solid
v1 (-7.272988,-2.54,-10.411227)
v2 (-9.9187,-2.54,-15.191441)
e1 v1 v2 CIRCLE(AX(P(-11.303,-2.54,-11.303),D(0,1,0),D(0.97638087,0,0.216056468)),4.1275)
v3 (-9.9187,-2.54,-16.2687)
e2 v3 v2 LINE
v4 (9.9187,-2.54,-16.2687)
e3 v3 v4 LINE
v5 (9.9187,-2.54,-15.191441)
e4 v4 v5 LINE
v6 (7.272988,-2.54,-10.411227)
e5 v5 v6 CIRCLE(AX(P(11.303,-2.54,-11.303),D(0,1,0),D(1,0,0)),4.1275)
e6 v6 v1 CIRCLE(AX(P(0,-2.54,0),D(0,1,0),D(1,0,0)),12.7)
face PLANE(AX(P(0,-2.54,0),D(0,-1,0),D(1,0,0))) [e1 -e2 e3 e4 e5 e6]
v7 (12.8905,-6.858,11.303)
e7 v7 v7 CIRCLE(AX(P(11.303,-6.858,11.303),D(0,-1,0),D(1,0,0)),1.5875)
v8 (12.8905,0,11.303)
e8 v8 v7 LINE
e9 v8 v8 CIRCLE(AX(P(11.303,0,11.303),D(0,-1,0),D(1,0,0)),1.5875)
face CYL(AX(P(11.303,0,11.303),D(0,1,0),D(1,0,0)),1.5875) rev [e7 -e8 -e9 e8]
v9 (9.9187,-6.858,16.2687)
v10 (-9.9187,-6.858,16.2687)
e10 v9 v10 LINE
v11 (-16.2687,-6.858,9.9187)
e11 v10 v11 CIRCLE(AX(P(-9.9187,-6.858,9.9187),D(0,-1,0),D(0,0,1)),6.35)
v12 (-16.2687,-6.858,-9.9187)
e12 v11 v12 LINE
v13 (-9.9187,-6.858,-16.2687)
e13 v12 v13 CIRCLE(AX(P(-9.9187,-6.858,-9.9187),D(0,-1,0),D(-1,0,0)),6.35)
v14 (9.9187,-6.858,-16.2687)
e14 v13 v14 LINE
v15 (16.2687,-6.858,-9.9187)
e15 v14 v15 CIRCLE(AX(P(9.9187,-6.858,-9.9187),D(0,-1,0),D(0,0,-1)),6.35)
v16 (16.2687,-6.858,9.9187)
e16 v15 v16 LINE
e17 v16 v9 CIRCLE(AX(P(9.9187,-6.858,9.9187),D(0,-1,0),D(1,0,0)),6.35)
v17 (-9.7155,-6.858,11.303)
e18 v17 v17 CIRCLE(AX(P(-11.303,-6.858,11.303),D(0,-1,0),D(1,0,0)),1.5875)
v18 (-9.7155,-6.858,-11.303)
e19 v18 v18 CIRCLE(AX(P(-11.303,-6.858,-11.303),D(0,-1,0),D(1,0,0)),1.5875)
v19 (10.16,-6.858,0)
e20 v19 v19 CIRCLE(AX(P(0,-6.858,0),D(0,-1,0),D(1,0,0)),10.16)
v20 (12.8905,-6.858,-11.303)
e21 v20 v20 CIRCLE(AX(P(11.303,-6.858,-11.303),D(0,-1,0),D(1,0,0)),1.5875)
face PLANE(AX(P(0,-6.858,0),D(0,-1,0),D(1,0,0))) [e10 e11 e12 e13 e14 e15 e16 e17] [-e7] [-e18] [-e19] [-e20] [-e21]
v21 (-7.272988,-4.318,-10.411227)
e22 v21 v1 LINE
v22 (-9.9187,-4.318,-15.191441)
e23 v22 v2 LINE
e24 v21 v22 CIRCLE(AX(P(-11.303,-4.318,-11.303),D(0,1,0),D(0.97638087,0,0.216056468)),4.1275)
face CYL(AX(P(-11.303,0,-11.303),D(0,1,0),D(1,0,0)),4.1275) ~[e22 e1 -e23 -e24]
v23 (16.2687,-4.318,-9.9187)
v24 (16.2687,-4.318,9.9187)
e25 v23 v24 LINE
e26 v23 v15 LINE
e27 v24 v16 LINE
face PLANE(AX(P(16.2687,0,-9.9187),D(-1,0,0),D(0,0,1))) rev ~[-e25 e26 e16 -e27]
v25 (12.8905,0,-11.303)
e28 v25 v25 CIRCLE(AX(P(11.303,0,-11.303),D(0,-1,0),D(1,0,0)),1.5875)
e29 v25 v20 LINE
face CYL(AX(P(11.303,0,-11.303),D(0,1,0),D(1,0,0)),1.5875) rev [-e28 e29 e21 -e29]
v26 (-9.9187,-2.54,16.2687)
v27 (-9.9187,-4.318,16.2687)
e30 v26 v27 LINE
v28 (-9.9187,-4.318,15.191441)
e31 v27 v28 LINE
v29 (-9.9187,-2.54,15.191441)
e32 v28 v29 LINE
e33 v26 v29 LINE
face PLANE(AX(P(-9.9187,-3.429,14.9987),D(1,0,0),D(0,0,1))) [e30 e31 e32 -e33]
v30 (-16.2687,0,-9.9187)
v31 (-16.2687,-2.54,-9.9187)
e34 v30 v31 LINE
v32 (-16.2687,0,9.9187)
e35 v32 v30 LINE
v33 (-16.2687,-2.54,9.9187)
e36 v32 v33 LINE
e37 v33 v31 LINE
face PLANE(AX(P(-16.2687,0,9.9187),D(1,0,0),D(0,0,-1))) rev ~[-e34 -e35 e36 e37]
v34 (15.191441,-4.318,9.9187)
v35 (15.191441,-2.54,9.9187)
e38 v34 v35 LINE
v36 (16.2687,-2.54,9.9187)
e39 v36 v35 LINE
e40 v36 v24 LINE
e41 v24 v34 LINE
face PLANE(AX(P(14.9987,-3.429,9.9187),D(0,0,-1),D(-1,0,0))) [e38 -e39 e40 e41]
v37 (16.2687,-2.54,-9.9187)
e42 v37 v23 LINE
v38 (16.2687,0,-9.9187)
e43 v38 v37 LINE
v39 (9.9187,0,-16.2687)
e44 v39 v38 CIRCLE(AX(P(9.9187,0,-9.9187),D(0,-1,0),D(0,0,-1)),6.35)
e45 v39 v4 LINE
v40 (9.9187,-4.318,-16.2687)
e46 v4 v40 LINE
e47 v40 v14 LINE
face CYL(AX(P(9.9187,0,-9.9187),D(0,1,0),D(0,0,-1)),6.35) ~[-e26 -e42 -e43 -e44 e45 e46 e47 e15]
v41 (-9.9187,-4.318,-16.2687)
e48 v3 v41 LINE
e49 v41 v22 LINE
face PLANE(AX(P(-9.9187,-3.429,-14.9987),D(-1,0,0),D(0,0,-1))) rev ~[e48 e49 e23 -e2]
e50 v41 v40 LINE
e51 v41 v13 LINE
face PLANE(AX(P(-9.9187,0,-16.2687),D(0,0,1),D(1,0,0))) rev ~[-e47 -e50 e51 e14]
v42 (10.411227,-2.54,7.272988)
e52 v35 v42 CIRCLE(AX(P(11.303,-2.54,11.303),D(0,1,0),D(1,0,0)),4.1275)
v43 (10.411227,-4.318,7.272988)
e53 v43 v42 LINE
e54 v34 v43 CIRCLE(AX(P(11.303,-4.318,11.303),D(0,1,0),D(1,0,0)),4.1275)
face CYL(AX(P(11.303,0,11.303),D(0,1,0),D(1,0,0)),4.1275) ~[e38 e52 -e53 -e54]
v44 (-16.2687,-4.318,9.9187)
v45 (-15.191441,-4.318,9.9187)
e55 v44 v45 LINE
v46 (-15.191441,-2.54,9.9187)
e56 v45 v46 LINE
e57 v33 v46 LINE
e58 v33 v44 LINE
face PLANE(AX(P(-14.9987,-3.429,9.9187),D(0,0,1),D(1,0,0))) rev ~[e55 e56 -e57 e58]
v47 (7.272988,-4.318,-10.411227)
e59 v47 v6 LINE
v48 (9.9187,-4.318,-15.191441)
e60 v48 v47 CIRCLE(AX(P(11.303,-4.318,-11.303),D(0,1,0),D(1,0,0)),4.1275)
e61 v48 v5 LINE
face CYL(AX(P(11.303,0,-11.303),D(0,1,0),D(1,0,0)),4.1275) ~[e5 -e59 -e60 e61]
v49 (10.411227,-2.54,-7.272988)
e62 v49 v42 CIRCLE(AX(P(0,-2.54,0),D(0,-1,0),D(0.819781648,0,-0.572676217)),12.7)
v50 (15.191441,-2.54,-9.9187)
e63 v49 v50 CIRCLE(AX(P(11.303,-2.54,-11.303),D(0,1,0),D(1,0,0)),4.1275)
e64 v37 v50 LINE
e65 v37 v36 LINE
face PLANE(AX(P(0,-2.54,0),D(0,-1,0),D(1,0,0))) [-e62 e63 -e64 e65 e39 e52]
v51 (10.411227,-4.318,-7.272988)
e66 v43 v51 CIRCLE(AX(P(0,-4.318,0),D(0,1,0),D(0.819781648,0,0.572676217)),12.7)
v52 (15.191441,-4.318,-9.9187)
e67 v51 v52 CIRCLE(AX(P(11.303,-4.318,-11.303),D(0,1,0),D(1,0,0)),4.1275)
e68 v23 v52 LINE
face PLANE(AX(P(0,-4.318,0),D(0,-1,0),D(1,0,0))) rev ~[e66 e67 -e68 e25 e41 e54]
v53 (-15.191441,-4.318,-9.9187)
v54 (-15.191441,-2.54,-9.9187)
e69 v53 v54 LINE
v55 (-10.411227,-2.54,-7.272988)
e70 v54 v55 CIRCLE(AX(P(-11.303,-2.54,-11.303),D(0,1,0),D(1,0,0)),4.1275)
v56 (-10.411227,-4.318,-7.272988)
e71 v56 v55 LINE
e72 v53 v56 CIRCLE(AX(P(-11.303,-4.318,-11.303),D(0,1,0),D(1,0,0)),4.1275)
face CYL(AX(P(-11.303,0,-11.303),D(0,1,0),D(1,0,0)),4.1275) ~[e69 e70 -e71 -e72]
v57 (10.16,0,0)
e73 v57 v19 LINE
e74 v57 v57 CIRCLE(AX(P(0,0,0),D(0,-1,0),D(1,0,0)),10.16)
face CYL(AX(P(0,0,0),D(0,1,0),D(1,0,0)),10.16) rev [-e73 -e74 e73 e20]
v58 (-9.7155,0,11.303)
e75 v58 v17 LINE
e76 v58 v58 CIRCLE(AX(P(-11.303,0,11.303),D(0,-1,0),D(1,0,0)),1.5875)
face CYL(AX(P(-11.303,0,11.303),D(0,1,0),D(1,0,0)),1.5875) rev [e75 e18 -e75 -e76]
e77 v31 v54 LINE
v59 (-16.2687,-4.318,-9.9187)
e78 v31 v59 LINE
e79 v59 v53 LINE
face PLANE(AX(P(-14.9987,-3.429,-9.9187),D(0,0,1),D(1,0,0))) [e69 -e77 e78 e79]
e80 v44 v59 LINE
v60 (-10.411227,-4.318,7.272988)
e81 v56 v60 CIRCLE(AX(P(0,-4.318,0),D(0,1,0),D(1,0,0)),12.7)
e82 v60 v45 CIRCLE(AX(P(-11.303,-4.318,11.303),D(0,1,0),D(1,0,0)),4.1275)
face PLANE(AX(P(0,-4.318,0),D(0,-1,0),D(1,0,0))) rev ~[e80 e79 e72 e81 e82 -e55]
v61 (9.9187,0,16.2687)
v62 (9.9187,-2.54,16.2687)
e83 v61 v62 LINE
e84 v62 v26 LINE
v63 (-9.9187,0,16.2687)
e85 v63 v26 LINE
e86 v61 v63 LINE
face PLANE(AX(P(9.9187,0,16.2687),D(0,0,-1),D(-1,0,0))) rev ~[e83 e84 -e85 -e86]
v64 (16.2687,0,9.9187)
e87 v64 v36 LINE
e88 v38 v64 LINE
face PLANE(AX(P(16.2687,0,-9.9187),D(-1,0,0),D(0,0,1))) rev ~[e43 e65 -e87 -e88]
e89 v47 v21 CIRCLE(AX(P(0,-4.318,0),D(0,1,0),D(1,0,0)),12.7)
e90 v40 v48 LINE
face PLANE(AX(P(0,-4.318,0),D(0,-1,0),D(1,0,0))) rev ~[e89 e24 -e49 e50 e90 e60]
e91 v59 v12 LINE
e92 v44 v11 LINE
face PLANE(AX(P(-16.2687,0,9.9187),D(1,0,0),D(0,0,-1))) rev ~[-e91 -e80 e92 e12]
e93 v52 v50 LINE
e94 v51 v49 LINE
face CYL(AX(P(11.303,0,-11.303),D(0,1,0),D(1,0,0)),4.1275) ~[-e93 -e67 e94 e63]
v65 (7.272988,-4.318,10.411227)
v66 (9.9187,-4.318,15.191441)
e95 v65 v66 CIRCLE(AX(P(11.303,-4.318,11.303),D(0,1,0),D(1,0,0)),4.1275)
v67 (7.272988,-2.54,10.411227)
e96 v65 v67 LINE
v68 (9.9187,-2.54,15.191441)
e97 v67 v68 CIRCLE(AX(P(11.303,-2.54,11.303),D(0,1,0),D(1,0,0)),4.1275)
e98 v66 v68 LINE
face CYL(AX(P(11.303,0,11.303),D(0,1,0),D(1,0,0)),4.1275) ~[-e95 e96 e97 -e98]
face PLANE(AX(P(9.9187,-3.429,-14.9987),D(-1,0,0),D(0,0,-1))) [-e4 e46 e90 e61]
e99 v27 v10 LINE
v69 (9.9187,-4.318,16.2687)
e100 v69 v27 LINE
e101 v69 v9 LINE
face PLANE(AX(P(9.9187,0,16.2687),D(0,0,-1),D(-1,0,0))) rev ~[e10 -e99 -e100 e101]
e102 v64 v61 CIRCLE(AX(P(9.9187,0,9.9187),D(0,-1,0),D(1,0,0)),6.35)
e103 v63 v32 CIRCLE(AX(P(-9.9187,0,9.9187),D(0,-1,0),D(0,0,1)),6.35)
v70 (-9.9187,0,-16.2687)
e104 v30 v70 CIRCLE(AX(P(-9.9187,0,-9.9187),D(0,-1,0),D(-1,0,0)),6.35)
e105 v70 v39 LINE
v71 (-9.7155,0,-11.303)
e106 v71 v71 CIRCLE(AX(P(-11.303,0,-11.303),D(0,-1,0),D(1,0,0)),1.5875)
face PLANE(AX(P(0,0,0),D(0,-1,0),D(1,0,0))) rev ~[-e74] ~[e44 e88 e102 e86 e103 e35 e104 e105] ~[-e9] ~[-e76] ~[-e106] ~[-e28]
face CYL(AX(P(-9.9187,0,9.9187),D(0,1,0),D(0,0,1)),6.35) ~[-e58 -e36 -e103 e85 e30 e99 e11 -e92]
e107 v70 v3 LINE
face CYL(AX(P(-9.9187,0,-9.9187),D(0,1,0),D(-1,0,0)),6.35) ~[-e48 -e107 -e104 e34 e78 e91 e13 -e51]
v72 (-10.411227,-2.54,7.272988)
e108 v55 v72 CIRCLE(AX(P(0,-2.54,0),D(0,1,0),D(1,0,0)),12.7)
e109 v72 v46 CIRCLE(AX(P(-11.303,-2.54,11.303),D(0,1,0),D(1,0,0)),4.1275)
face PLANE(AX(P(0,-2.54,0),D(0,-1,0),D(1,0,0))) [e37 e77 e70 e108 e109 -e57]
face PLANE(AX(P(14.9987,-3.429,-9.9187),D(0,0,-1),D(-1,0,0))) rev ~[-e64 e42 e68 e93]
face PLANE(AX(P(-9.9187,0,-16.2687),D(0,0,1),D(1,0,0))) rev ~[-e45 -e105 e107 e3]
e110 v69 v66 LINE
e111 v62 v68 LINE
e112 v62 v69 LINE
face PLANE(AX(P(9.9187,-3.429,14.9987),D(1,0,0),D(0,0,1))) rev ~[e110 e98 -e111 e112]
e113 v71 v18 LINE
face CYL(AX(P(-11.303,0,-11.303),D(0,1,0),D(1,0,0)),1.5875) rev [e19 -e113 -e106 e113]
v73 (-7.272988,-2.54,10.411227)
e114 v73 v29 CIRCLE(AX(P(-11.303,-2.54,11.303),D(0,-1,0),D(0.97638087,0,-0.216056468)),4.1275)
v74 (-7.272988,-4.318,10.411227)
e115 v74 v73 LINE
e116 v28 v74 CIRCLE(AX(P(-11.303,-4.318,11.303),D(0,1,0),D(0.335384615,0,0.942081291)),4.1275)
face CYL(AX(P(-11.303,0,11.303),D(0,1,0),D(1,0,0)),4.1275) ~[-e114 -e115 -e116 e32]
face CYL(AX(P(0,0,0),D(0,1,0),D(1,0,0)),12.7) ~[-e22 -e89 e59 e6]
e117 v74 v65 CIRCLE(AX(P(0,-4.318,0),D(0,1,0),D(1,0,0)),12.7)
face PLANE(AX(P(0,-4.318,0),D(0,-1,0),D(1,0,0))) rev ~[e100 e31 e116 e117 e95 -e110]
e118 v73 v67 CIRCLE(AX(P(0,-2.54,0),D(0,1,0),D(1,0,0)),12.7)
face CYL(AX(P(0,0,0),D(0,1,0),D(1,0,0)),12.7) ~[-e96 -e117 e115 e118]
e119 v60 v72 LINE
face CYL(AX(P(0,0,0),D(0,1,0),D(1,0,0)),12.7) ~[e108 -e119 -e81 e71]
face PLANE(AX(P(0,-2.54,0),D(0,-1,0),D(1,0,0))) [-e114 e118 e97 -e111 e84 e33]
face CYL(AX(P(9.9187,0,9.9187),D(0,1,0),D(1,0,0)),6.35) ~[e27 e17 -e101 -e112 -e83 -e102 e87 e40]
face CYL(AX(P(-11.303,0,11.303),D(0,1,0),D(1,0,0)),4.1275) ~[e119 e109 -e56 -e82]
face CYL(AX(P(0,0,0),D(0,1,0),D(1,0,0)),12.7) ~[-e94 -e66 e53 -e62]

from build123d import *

# Parameters (mm, degrees)
F0_R     = 1.5875
F0_R_2   = 10.16
F1_DEPTH = 6.858
F2_T     = 2.54


# Not quite as in the source:
# - a shell that OpenCascade refuses in one call is made with other operations: the cavity is built on its own and cut out


with BuildPart() as f1:
    # F0 (on Front) → F1 (new body)
    with BuildSketch(Plane.XZ):
        with BuildLine():
            Line((9.9187, 16.2687), (-9.9187, 16.2687))
            ThreePointArc((-9.9187, 16.2687), (-14.4088280605, 14.4088280605), (-16.2687, 9.9187))
            Line((-16.2687, 9.9187), (-16.2687, -9.9187))
            ThreePointArc((-16.2687, -9.9187), (-14.4088280605, -14.4088280605), (-9.9187, -16.2687))
            Line((-9.9187, -16.2687), (9.9187, -16.2687))
            ThreePointArc((9.9187, -16.2687), (14.4088280605, -14.4088280605), (16.2687, -9.9187))
            Line((16.2687, -9.9187), (16.2687, 9.9187))
            ThreePointArc((16.2687, 9.9187), (14.4088280605, 14.4088280605), (9.9187, 16.2687))
        make_face()
        with Locations((-11.303, -11.303)):
            Circle(F0_R, mode=Mode.SUBTRACT)
        with Locations((11.303, -11.303)):
            Circle(F0_R, mode=Mode.SUBTRACT)
        with Locations((-11.303, 11.303)):
            Circle(F0_R, mode=Mode.SUBTRACT)
        Circle(F0_R_2, mode=Mode.SUBTRACT)
        with Locations((11.303, 11.303)):
            Circle(F0_R, mode=Mode.SUBTRACT)
    extrude(amount=F1_DEPTH)

    # F2: shell of thickness 2.54, made by hand


with BuildPart() as f2_core1:
    # F2_t2: copy of F1
    add(f1.part)

    # the walls: a layer under each face that stays
    f2_faces = [f2_core1.faces().sort_by_distance(p)[0] for p in [
        (-14.4088280605, -3.429, 14.4088280605),
        (-14.4088280605, -3.429, -14.4088280605),
        (14.4088280605, -3.429, -14.4088280605),
        (14.4088280605, -3.429, 14.4088280605),
        (-12.8905, -3.429, -11.303),
        (9.7155, -3.429, -11.303),
        (-12.8905, -3.429, 11.303),
        (-10.16, -3.429, 0),
        (9.7155, -3.429, 11.303),
        (-10.8458, 0, 0),
        (-10.8458, -6.858, 0),
    ]]
    thicken(f2_faces, amount=-F2_T, mode=Mode.SUBTRACT)


with BuildPart() as f1_1:
    add(f1.part)

    # what is left inside the walls is the cavity
    f2_cavity = [f2_core1.part.solids().sort_by_distance(p)[0] for p in [
        (-4.95935, -4.2926, 14.316209),
        (13.339963, -4.2926, -3.306233),
        (-13.339963, -4.2926, -3.306233),
        (0, -2.5654, -14.316209),
    ]]
    add(f2_cavity, mode=Mode.SUBTRACT)


solid = f1_1.part
